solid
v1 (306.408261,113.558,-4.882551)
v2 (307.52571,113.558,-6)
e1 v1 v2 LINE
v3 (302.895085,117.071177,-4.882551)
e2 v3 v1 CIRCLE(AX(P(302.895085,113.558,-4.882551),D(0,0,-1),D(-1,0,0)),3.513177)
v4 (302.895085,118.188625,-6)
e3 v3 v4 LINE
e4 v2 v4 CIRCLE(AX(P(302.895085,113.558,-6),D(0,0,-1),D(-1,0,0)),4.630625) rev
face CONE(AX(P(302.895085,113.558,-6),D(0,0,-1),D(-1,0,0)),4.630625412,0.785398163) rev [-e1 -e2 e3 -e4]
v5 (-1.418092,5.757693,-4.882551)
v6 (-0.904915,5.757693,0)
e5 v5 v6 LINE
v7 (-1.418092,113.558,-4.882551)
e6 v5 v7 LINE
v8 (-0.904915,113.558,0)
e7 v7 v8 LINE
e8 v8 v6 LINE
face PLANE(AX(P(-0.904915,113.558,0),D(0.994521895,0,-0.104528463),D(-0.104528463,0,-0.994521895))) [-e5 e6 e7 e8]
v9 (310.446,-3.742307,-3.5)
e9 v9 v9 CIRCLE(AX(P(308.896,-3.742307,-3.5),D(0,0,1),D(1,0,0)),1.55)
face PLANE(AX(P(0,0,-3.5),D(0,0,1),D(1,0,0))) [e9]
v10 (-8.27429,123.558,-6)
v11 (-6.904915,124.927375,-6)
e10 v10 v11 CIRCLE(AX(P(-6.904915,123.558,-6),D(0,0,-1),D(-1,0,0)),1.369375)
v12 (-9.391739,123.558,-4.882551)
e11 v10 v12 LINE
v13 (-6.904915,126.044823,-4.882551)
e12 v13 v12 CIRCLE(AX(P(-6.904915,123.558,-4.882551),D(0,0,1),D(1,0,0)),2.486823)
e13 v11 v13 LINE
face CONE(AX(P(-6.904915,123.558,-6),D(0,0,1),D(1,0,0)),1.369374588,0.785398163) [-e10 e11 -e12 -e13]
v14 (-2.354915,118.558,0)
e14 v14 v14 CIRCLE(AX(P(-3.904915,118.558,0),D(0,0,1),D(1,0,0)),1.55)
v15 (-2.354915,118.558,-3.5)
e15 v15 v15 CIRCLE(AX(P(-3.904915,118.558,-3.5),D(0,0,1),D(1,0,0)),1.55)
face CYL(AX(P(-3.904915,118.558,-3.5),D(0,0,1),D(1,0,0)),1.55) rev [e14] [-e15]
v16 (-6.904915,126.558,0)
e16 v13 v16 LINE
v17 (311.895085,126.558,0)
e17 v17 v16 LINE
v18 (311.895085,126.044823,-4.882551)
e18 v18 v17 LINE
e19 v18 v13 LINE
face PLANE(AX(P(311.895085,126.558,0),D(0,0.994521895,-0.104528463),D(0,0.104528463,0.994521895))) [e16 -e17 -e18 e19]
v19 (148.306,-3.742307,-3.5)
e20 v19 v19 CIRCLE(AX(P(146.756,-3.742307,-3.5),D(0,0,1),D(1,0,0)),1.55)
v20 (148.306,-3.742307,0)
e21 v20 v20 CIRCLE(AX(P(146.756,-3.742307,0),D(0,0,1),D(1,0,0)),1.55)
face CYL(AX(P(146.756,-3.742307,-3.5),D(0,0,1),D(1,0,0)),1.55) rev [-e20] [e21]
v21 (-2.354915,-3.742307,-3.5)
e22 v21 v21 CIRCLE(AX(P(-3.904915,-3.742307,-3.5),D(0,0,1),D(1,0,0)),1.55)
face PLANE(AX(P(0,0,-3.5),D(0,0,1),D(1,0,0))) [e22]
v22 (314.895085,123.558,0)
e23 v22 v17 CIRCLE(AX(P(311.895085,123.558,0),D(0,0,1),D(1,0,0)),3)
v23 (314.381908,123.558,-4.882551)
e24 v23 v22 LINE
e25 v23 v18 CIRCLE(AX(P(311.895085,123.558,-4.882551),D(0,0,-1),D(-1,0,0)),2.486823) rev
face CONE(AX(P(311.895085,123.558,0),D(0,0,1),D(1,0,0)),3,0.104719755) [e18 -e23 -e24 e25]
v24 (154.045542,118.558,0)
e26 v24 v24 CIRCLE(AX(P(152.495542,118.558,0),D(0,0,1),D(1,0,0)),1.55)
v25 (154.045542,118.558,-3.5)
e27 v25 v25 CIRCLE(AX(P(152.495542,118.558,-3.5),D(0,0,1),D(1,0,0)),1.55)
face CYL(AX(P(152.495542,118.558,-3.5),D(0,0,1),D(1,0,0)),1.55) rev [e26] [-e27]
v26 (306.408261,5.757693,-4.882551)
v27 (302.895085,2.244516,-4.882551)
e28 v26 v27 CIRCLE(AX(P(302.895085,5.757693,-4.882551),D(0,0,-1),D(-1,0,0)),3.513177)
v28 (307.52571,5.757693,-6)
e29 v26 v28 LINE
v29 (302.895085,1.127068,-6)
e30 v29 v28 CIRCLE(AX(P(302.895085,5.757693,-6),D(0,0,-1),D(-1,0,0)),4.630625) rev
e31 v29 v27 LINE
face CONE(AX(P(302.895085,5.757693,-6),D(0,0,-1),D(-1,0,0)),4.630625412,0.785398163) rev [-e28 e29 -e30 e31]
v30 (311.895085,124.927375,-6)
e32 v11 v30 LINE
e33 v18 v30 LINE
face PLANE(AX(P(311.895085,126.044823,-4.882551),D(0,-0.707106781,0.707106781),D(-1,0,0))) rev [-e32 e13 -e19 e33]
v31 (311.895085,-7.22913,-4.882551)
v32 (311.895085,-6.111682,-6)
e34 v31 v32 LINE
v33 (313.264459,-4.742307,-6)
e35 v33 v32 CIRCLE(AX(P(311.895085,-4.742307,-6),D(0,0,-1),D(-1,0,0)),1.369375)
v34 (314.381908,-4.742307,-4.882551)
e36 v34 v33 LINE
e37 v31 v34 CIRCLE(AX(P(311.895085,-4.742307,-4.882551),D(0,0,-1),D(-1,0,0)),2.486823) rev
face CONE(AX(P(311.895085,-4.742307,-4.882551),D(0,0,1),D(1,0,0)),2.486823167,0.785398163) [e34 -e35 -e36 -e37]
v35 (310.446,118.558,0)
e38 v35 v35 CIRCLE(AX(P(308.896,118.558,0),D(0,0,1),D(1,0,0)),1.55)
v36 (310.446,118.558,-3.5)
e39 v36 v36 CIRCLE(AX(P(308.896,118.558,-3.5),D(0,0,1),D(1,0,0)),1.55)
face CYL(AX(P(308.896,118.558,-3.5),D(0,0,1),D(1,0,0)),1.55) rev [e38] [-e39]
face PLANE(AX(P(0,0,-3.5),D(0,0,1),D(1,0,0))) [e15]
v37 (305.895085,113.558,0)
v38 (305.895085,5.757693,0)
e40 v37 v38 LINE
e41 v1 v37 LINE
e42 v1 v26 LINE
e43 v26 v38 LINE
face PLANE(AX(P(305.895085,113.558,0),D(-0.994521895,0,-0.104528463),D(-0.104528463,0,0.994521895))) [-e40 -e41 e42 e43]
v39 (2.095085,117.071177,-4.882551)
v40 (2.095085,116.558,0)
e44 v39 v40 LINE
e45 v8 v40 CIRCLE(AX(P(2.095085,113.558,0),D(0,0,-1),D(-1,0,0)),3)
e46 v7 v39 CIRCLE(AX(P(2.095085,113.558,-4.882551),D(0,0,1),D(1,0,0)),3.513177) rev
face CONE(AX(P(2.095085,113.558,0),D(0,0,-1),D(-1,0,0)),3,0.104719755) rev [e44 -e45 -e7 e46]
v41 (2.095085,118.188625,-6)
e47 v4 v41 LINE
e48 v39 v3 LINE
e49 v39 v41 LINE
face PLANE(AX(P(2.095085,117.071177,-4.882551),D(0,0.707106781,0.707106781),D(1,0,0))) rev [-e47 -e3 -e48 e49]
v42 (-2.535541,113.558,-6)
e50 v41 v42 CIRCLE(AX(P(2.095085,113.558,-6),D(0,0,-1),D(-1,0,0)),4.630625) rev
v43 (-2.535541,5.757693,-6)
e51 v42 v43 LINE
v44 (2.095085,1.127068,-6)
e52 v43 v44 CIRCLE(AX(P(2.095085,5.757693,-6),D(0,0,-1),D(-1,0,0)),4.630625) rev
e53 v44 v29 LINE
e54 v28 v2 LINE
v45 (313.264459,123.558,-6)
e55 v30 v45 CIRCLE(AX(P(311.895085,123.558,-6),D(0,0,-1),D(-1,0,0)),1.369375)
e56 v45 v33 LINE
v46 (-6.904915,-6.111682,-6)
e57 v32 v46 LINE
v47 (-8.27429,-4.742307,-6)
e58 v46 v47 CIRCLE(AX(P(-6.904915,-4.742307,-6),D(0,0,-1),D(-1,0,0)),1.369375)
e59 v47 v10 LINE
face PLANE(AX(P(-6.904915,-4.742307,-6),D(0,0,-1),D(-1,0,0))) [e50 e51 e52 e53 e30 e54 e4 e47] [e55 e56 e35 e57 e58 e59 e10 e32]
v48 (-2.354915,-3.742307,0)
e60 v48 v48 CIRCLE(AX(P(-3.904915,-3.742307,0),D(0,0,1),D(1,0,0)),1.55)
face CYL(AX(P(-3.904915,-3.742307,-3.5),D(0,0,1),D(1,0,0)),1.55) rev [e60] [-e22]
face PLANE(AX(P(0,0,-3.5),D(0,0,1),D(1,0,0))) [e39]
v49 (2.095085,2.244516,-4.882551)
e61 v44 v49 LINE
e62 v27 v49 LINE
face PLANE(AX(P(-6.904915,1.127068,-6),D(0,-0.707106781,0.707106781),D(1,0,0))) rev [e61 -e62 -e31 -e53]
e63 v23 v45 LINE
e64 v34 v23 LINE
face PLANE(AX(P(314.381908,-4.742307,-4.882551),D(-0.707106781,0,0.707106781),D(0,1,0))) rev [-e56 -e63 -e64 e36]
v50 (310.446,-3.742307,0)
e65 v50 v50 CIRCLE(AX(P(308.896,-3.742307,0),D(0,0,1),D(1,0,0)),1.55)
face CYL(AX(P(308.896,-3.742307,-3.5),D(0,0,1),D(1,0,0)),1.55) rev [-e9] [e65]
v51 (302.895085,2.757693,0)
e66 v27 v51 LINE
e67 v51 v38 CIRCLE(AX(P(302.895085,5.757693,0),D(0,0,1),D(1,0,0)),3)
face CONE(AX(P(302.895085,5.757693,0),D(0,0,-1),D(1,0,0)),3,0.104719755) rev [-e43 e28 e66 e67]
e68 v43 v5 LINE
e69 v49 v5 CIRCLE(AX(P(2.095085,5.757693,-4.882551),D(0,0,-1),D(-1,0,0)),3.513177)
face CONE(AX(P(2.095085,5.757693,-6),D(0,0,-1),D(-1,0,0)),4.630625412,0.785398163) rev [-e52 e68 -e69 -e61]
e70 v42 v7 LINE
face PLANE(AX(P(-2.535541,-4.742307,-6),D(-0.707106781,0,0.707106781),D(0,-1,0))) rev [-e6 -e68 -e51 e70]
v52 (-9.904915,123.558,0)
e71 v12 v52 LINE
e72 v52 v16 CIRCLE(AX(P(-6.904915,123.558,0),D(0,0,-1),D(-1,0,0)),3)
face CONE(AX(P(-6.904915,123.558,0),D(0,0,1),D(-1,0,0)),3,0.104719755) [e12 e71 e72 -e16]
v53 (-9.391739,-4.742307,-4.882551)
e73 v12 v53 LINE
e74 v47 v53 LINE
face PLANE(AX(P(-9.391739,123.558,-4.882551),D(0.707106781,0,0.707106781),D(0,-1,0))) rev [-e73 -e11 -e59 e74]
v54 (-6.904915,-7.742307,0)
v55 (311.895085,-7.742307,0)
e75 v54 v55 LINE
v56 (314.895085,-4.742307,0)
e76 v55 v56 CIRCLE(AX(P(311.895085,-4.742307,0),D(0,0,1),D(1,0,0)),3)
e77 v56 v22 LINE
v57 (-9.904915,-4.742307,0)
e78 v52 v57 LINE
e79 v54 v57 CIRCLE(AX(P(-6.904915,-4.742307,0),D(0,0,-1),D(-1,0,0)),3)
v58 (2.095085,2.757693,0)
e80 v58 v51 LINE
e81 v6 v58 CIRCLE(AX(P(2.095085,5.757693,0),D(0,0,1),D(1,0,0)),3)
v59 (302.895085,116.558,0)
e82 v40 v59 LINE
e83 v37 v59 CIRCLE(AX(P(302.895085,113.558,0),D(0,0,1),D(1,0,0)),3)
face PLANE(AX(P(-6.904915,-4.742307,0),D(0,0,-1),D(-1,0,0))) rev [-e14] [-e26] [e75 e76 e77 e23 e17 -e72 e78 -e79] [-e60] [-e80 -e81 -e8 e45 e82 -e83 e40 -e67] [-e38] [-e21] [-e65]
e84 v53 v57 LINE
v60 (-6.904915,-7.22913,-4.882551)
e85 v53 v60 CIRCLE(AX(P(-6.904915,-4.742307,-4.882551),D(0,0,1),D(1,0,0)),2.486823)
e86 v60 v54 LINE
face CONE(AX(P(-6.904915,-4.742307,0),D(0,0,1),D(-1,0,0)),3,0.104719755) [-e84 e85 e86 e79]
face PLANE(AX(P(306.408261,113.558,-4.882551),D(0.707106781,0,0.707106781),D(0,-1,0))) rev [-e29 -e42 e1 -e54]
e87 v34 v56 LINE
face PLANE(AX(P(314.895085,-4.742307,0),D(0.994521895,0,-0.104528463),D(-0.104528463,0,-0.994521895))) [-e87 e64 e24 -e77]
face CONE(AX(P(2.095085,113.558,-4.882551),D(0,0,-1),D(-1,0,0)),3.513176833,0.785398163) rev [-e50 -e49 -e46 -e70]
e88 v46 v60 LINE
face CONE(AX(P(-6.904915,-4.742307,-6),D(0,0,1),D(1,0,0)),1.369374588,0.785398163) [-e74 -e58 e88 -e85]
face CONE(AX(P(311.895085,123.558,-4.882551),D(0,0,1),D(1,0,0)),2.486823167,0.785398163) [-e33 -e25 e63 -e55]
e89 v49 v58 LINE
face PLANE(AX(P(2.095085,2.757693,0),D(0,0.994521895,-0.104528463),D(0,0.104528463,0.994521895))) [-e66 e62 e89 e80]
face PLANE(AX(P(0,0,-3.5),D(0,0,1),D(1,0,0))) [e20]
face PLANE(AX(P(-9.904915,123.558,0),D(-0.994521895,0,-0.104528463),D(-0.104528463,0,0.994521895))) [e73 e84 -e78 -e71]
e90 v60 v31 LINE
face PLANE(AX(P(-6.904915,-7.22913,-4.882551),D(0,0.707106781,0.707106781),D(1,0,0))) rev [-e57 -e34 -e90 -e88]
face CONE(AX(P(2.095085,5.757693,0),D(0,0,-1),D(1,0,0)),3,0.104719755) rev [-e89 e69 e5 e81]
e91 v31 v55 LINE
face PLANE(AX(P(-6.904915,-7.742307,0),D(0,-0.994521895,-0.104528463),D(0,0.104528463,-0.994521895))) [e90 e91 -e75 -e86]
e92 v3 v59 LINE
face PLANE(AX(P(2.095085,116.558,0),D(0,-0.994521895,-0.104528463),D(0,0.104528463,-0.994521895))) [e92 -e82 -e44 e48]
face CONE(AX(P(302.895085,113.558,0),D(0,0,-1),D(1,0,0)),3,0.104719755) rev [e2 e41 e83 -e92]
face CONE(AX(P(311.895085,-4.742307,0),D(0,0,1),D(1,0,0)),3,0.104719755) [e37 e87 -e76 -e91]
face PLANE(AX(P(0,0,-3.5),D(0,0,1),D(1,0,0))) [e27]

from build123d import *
from OCP.BRepFilletAPI import BRepFilletAPI_MakeChamfer

# Parameters (mm, degrees)
EXTRUDE_1_DEPTH     = 6
EXTRUDE_1_DRAFT     = -6
CHAMFER_2_SIZE      = 1.123603797
CHAMFER_2_SIZE_2    = 1
SKETCH_3_3_R        = 1.55
CUT_EXTRUDE_1_DEPTH = 3.5
CHAMFER_3_SIZE      = 1
CHAMFER_3_SIZE_2    = 1.123603797


with BuildPart() as part:
    # 草图3 → 凸台-拉伸1 (with draft: the straight prism first)
    with BuildSketch(Plane.XY):
        with BuildLine():
            Line((-9.9049154, 123.558), (-9.9049154, -4.742307))
            ThreePointArc((-9.9049154, -4.742307), (-9.026235744, -6.863627344), (-6.9049154, -7.742307))
            Line((-6.9049154, -7.742307), (311.8950846, -7.742307))
            ThreePointArc((311.8950846, -7.742307), (314.016404944, -6.863627344), (314.8950846, -4.742307))
            Line((314.8950846, -4.742307), (314.8950846, 123.558))
            ThreePointArc((314.8950846, 123.558), (314.016404944, 125.679320344), (311.8950846, 126.558))
            Line((311.8950846, 126.558), (-6.9049154, 126.558))
            ThreePointArc((-6.9049154, 126.558), (-9.026235744, 125.679320344), (-9.9049154, 123.558))
        make_face()
        with BuildLine():
            Line((2.0950846, 116.558), (302.8950846, 116.558))
            ThreePointArc((302.8950846, 116.558), (305.016404944, 115.679320344), (305.8950846, 113.558))
            Line((305.8950846, 113.558), (305.8950846, 5.757693))
            ThreePointArc((305.8950846, 5.757693), (305.016404944, 3.636372656), (302.8950846, 2.757693))
            Line((302.8950846, 2.757693), (2.0950846, 2.757693))
            ThreePointArc((2.0950846, 2.757693), (-0.026235744, 3.636372656), (-0.9049154, 5.757693))
            Line((-0.9049154, 5.757693), (-0.9049154, 113.558))
            ThreePointArc((-0.9049154, 113.558), (-0.026235744, 115.679320344), (2.0950846, 116.558))
        make_face(mode=Mode.SUBTRACT)
    extrude(amount=-EXTRUDE_1_DEPTH)
    # 凸台-拉伸1: the draft: its side faces are tilted about the plane it starts from
    extrude_1_sides = [part.faces().sort_by_distance(p)[0] for p in [
        (152.4950846, 126.558, -3),
        (-9.026235744, 125.679320344, -3),
        (-9.9049154, 59.4078465, -3),
        (-9.026235744, -6.863627344, -3),
        (152.4950846, -7.742307, -3),
        (314.016404944, -6.863627344, -3),
        (314.8950846, 59.4078465, -3),
        (314.016404944, 125.679320344, -3),
        (-0.026235744, 115.679320344, -3),
        (152.4950846, 116.558, -3),
        (305.016404944, 115.679320344, -3),
        (305.8950846, 59.6578465, -3),
        (305.016404944, 3.636372656, -3),
        (152.4950846, 2.757693, -3),
        (-0.026235744, 3.636372656, -3),
        (-0.9049154, 59.6578465, -3),
    ]]
    draft(extrude_1_sides, Plane.XY, EXTRUDE_1_DRAFT)

    # 倒角2
    chamfer_2_edges_1 = [part.edges().sort_by_distance(p)[0] for p in [
        (-0.472155248, 116.125239848, -6),
    ]]
    chamfer_2_side_1 = [part.faces().sort_by_distance(p)[0] for p in [
        (-0.470676993, 116.123761593, -5.980109562),
    ]]
    chamfer_2_edges_2 = [part.edges().sort_by_distance(p)[0] for p in [
        (152.4950846, 117.188625412, -6),
    ]]
    chamfer_2_side_2 = [part.faces().sort_by_distance(p)[0] for p in [
        (152.4950846, 117.186534842, -5.980109562),
    ]]
    chamfer_2_edges_3 = [part.edges().sort_by_distance(p)[0] for p in [
        (305.462324448, 116.125239848, -6),
    ]]
    chamfer_2_side_3 = [part.faces().sort_by_distance(p)[0] for p in [
        (305.460846193, 116.123761593, -5.980109562),
    ]]
    chamfer_2_edges_4 = [part.edges().sort_by_distance(p)[0] for p in [
        (306.525710012, 59.6578465, -6),
    ]]
    chamfer_2_side_4 = [part.faces().sort_by_distance(p)[0] for p in [
        (306.523619442, 59.6578465, -5.980109562),
    ]]
    chamfer_2_edges_5 = [part.edges().sort_by_distance(p)[0] for p in [
        (305.462324448, 3.190453152, -6),
    ]]
    chamfer_2_side_5 = [part.faces().sort_by_distance(p)[0] for p in [
        (305.460846193, 3.191931407, -5.980109562),
    ]]
    chamfer_2_edges_6 = [part.edges().sort_by_distance(p)[0] for p in [
        (152.4950846, 2.127067588, -6),
    ]]
    chamfer_2_side_6 = [part.faces().sort_by_distance(p)[0] for p in [
        (152.4950846, 2.129158158, -5.980109562),
    ]]
    chamfer_2_edges_7 = [part.edges().sort_by_distance(p)[0] for p in [
        (-0.472155248, 3.190453152, -6),
    ]]
    chamfer_2_side_7 = [part.faces().sort_by_distance(p)[0] for p in [
        (-0.470676993, 3.191931407, -5.980109562),
    ]]
    chamfer_2_edges_8 = [part.edges().sort_by_distance(p)[0] for p in [
        (-1.535540812, 59.6578465, -6),
    ]]
    chamfer_2_side_8 = [part.faces().sort_by_distance(p)[0] for p in [
        (-1.533450242, 59.6578465, -5.980109562),
    ]]
    chamfer_2 = BRepFilletAPI_MakeChamfer(part.part.solid().wrapped)
    for e in chamfer_2_edges_1:
        chamfer_2.Add(CHAMFER_2_SIZE, CHAMFER_2_SIZE_2, e.wrapped, chamfer_2_side_1[0].wrapped)
    for e in chamfer_2_edges_2:
        chamfer_2.Add(CHAMFER_2_SIZE, CHAMFER_2_SIZE_2, e.wrapped, chamfer_2_side_2[0].wrapped)
    for e in chamfer_2_edges_3:
        chamfer_2.Add(CHAMFER_2_SIZE, CHAMFER_2_SIZE_2, e.wrapped, chamfer_2_side_3[0].wrapped)
    for e in chamfer_2_edges_4:
        chamfer_2.Add(CHAMFER_2_SIZE, CHAMFER_2_SIZE_2, e.wrapped, chamfer_2_side_4[0].wrapped)
    for e in chamfer_2_edges_5:
        chamfer_2.Add(CHAMFER_2_SIZE, CHAMFER_2_SIZE_2, e.wrapped, chamfer_2_side_5[0].wrapped)
    for e in chamfer_2_edges_6:
        chamfer_2.Add(CHAMFER_2_SIZE, CHAMFER_2_SIZE_2, e.wrapped, chamfer_2_side_6[0].wrapped)
    for e in chamfer_2_edges_7:
        chamfer_2.Add(CHAMFER_2_SIZE_2, CHAMFER_2_SIZE, e.wrapped, chamfer_2_side_7[0].wrapped)
    for e in chamfer_2_edges_8:
        chamfer_2.Add(CHAMFER_2_SIZE, CHAMFER_2_SIZE_2, e.wrapped, chamfer_2_side_8[0].wrapped)
    add(Compound.cast(chamfer_2.Shape()), mode=Mode.REPLACE)

    # 草图3<3> → 切除-拉伸1 (cut)
    with BuildSketch(Plane.XY):
        with Locations((-3.9049154, -3.742307)):
            Circle(SKETCH_3_3_R)
        with Locations((-3.9049154, 118.558)):
            Circle(SKETCH_3_3_R)
        with Locations((152.4955423, 118.558)):
            Circle(SKETCH_3_3_R)
        with Locations((308.896, 118.558)):
            Circle(SKETCH_3_3_R)
        with Locations((308.896, -3.742307)):
            Circle(SKETCH_3_3_R)
        with Locations((146.756, -3.742307)):
            Circle(SKETCH_3_3_R)
    extrude(amount=-CUT_EXTRUDE_1_DEPTH, mode=Mode.SUBTRACT)

    # 倒角3
    chamfer_3_edges_1 = [part.edges().sort_by_distance(p)[0] for p in [
        (152.4950846, 125.927374588, -6),
    ]]
    chamfer_3_side_1 = [part.faces().sort_by_distance(p)[0] for p in [
        (152.4950846, 125.907374588, -6),
    ]]
    chamfer_3_edges_2 = [part.edges().sort_by_distance(p)[0] for p in [
        (-8.580316239, 125.233400839, -6),
    ]]
    chamfer_3_side_2 = [part.faces().sort_by_distance(p)[0] for p in [
        (-8.566174103, 125.219258703, -6),
    ]]
    chamfer_3_edges_3 = [part.edges().sort_by_distance(p)[0] for p in [
        (-9.274289988, 59.4078465, -6),
    ]]
    chamfer_3_side_3 = [part.faces().sort_by_distance(p)[0] for p in [
        (-9.254289988, 59.4078465, -6),
    ]]
    chamfer_3_edges_4 = [part.edges().sort_by_distance(p)[0] for p in [
        (-8.580316239, -6.417707839, -6),
    ]]
    chamfer_3_side_4 = [part.faces().sort_by_distance(p)[0] for p in [
        (-8.566174103, -6.403565703, -6),
    ]]
    chamfer_3_edges_5 = [part.edges().sort_by_distance(p)[0] for p in [
        (152.4950846, -7.111681588, -6),
    ]]
    chamfer_3_side_5 = [part.faces().sort_by_distance(p)[0] for p in [
        (152.4950846, -7.091681588, -6),
    ]]
    chamfer_3_edges_6 = [part.edges().sort_by_distance(p)[0] for p in [
        (313.570485439, -6.417707839, -6),
    ]]
    chamfer_3_side_6 = [part.faces().sort_by_distance(p)[0] for p in [
        (313.556343303, -6.403565703, -6),
    ]]
    chamfer_3_edges_7 = [part.edges().sort_by_distance(p)[0] for p in [
        (314.264459188, 59.4078465, -6),
    ]]
    chamfer_3_side_7 = [part.faces().sort_by_distance(p)[0] for p in [
        (314.244459188, 59.4078465, -6),
    ]]
    chamfer_3_edges_8 = [part.edges().sort_by_distance(p)[0] for p in [
        (313.570485439, 125.233400839, -6),
    ]]
    chamfer_3_side_8 = [part.faces().sort_by_distance(p)[0] for p in [
        (313.556343303, 125.219258703, -6),
    ]]
    chamfer_3 = BRepFilletAPI_MakeChamfer(part.part.solid().wrapped)
    for e in chamfer_3_edges_1:
        chamfer_3.Add(CHAMFER_3_SIZE, CHAMFER_3_SIZE_2, e.wrapped, chamfer_3_side_1[0].wrapped)
    for e in chamfer_3_edges_2:
        chamfer_3.Add(CHAMFER_3_SIZE_2, CHAMFER_3_SIZE, e.wrapped, chamfer_3_side_2[0].wrapped)
    for e in chamfer_3_edges_3:
        chamfer_3.Add(CHAMFER_3_SIZE, CHAMFER_3_SIZE_2, e.wrapped, chamfer_3_side_3[0].wrapped)
    for e in chamfer_3_edges_4:
        chamfer_3.Add(CHAMFER_3_SIZE, CHAMFER_3_SIZE_2, e.wrapped, chamfer_3_side_4[0].wrapped)
    for e in chamfer_3_edges_5:
        chamfer_3.Add(CHAMFER_3_SIZE, CHAMFER_3_SIZE_2, e.wrapped, chamfer_3_side_5[0].wrapped)
    for e in chamfer_3_edges_6:
        chamfer_3.Add(CHAMFER_3_SIZE, CHAMFER_3_SIZE_2, e.wrapped, chamfer_3_side_6[0].wrapped)
    for e in chamfer_3_edges_7:
        chamfer_3.Add(CHAMFER_3_SIZE, CHAMFER_3_SIZE_2, e.wrapped, chamfer_3_side_7[0].wrapped)
    for e in chamfer_3_edges_8:
        chamfer_3.Add(CHAMFER_3_SIZE, CHAMFER_3_SIZE_2, e.wrapped, chamfer_3_side_8[0].wrapped)
    add(Compound.cast(chamfer_3.Shape()), mode=Mode.REPLACE)


solid = part.part
